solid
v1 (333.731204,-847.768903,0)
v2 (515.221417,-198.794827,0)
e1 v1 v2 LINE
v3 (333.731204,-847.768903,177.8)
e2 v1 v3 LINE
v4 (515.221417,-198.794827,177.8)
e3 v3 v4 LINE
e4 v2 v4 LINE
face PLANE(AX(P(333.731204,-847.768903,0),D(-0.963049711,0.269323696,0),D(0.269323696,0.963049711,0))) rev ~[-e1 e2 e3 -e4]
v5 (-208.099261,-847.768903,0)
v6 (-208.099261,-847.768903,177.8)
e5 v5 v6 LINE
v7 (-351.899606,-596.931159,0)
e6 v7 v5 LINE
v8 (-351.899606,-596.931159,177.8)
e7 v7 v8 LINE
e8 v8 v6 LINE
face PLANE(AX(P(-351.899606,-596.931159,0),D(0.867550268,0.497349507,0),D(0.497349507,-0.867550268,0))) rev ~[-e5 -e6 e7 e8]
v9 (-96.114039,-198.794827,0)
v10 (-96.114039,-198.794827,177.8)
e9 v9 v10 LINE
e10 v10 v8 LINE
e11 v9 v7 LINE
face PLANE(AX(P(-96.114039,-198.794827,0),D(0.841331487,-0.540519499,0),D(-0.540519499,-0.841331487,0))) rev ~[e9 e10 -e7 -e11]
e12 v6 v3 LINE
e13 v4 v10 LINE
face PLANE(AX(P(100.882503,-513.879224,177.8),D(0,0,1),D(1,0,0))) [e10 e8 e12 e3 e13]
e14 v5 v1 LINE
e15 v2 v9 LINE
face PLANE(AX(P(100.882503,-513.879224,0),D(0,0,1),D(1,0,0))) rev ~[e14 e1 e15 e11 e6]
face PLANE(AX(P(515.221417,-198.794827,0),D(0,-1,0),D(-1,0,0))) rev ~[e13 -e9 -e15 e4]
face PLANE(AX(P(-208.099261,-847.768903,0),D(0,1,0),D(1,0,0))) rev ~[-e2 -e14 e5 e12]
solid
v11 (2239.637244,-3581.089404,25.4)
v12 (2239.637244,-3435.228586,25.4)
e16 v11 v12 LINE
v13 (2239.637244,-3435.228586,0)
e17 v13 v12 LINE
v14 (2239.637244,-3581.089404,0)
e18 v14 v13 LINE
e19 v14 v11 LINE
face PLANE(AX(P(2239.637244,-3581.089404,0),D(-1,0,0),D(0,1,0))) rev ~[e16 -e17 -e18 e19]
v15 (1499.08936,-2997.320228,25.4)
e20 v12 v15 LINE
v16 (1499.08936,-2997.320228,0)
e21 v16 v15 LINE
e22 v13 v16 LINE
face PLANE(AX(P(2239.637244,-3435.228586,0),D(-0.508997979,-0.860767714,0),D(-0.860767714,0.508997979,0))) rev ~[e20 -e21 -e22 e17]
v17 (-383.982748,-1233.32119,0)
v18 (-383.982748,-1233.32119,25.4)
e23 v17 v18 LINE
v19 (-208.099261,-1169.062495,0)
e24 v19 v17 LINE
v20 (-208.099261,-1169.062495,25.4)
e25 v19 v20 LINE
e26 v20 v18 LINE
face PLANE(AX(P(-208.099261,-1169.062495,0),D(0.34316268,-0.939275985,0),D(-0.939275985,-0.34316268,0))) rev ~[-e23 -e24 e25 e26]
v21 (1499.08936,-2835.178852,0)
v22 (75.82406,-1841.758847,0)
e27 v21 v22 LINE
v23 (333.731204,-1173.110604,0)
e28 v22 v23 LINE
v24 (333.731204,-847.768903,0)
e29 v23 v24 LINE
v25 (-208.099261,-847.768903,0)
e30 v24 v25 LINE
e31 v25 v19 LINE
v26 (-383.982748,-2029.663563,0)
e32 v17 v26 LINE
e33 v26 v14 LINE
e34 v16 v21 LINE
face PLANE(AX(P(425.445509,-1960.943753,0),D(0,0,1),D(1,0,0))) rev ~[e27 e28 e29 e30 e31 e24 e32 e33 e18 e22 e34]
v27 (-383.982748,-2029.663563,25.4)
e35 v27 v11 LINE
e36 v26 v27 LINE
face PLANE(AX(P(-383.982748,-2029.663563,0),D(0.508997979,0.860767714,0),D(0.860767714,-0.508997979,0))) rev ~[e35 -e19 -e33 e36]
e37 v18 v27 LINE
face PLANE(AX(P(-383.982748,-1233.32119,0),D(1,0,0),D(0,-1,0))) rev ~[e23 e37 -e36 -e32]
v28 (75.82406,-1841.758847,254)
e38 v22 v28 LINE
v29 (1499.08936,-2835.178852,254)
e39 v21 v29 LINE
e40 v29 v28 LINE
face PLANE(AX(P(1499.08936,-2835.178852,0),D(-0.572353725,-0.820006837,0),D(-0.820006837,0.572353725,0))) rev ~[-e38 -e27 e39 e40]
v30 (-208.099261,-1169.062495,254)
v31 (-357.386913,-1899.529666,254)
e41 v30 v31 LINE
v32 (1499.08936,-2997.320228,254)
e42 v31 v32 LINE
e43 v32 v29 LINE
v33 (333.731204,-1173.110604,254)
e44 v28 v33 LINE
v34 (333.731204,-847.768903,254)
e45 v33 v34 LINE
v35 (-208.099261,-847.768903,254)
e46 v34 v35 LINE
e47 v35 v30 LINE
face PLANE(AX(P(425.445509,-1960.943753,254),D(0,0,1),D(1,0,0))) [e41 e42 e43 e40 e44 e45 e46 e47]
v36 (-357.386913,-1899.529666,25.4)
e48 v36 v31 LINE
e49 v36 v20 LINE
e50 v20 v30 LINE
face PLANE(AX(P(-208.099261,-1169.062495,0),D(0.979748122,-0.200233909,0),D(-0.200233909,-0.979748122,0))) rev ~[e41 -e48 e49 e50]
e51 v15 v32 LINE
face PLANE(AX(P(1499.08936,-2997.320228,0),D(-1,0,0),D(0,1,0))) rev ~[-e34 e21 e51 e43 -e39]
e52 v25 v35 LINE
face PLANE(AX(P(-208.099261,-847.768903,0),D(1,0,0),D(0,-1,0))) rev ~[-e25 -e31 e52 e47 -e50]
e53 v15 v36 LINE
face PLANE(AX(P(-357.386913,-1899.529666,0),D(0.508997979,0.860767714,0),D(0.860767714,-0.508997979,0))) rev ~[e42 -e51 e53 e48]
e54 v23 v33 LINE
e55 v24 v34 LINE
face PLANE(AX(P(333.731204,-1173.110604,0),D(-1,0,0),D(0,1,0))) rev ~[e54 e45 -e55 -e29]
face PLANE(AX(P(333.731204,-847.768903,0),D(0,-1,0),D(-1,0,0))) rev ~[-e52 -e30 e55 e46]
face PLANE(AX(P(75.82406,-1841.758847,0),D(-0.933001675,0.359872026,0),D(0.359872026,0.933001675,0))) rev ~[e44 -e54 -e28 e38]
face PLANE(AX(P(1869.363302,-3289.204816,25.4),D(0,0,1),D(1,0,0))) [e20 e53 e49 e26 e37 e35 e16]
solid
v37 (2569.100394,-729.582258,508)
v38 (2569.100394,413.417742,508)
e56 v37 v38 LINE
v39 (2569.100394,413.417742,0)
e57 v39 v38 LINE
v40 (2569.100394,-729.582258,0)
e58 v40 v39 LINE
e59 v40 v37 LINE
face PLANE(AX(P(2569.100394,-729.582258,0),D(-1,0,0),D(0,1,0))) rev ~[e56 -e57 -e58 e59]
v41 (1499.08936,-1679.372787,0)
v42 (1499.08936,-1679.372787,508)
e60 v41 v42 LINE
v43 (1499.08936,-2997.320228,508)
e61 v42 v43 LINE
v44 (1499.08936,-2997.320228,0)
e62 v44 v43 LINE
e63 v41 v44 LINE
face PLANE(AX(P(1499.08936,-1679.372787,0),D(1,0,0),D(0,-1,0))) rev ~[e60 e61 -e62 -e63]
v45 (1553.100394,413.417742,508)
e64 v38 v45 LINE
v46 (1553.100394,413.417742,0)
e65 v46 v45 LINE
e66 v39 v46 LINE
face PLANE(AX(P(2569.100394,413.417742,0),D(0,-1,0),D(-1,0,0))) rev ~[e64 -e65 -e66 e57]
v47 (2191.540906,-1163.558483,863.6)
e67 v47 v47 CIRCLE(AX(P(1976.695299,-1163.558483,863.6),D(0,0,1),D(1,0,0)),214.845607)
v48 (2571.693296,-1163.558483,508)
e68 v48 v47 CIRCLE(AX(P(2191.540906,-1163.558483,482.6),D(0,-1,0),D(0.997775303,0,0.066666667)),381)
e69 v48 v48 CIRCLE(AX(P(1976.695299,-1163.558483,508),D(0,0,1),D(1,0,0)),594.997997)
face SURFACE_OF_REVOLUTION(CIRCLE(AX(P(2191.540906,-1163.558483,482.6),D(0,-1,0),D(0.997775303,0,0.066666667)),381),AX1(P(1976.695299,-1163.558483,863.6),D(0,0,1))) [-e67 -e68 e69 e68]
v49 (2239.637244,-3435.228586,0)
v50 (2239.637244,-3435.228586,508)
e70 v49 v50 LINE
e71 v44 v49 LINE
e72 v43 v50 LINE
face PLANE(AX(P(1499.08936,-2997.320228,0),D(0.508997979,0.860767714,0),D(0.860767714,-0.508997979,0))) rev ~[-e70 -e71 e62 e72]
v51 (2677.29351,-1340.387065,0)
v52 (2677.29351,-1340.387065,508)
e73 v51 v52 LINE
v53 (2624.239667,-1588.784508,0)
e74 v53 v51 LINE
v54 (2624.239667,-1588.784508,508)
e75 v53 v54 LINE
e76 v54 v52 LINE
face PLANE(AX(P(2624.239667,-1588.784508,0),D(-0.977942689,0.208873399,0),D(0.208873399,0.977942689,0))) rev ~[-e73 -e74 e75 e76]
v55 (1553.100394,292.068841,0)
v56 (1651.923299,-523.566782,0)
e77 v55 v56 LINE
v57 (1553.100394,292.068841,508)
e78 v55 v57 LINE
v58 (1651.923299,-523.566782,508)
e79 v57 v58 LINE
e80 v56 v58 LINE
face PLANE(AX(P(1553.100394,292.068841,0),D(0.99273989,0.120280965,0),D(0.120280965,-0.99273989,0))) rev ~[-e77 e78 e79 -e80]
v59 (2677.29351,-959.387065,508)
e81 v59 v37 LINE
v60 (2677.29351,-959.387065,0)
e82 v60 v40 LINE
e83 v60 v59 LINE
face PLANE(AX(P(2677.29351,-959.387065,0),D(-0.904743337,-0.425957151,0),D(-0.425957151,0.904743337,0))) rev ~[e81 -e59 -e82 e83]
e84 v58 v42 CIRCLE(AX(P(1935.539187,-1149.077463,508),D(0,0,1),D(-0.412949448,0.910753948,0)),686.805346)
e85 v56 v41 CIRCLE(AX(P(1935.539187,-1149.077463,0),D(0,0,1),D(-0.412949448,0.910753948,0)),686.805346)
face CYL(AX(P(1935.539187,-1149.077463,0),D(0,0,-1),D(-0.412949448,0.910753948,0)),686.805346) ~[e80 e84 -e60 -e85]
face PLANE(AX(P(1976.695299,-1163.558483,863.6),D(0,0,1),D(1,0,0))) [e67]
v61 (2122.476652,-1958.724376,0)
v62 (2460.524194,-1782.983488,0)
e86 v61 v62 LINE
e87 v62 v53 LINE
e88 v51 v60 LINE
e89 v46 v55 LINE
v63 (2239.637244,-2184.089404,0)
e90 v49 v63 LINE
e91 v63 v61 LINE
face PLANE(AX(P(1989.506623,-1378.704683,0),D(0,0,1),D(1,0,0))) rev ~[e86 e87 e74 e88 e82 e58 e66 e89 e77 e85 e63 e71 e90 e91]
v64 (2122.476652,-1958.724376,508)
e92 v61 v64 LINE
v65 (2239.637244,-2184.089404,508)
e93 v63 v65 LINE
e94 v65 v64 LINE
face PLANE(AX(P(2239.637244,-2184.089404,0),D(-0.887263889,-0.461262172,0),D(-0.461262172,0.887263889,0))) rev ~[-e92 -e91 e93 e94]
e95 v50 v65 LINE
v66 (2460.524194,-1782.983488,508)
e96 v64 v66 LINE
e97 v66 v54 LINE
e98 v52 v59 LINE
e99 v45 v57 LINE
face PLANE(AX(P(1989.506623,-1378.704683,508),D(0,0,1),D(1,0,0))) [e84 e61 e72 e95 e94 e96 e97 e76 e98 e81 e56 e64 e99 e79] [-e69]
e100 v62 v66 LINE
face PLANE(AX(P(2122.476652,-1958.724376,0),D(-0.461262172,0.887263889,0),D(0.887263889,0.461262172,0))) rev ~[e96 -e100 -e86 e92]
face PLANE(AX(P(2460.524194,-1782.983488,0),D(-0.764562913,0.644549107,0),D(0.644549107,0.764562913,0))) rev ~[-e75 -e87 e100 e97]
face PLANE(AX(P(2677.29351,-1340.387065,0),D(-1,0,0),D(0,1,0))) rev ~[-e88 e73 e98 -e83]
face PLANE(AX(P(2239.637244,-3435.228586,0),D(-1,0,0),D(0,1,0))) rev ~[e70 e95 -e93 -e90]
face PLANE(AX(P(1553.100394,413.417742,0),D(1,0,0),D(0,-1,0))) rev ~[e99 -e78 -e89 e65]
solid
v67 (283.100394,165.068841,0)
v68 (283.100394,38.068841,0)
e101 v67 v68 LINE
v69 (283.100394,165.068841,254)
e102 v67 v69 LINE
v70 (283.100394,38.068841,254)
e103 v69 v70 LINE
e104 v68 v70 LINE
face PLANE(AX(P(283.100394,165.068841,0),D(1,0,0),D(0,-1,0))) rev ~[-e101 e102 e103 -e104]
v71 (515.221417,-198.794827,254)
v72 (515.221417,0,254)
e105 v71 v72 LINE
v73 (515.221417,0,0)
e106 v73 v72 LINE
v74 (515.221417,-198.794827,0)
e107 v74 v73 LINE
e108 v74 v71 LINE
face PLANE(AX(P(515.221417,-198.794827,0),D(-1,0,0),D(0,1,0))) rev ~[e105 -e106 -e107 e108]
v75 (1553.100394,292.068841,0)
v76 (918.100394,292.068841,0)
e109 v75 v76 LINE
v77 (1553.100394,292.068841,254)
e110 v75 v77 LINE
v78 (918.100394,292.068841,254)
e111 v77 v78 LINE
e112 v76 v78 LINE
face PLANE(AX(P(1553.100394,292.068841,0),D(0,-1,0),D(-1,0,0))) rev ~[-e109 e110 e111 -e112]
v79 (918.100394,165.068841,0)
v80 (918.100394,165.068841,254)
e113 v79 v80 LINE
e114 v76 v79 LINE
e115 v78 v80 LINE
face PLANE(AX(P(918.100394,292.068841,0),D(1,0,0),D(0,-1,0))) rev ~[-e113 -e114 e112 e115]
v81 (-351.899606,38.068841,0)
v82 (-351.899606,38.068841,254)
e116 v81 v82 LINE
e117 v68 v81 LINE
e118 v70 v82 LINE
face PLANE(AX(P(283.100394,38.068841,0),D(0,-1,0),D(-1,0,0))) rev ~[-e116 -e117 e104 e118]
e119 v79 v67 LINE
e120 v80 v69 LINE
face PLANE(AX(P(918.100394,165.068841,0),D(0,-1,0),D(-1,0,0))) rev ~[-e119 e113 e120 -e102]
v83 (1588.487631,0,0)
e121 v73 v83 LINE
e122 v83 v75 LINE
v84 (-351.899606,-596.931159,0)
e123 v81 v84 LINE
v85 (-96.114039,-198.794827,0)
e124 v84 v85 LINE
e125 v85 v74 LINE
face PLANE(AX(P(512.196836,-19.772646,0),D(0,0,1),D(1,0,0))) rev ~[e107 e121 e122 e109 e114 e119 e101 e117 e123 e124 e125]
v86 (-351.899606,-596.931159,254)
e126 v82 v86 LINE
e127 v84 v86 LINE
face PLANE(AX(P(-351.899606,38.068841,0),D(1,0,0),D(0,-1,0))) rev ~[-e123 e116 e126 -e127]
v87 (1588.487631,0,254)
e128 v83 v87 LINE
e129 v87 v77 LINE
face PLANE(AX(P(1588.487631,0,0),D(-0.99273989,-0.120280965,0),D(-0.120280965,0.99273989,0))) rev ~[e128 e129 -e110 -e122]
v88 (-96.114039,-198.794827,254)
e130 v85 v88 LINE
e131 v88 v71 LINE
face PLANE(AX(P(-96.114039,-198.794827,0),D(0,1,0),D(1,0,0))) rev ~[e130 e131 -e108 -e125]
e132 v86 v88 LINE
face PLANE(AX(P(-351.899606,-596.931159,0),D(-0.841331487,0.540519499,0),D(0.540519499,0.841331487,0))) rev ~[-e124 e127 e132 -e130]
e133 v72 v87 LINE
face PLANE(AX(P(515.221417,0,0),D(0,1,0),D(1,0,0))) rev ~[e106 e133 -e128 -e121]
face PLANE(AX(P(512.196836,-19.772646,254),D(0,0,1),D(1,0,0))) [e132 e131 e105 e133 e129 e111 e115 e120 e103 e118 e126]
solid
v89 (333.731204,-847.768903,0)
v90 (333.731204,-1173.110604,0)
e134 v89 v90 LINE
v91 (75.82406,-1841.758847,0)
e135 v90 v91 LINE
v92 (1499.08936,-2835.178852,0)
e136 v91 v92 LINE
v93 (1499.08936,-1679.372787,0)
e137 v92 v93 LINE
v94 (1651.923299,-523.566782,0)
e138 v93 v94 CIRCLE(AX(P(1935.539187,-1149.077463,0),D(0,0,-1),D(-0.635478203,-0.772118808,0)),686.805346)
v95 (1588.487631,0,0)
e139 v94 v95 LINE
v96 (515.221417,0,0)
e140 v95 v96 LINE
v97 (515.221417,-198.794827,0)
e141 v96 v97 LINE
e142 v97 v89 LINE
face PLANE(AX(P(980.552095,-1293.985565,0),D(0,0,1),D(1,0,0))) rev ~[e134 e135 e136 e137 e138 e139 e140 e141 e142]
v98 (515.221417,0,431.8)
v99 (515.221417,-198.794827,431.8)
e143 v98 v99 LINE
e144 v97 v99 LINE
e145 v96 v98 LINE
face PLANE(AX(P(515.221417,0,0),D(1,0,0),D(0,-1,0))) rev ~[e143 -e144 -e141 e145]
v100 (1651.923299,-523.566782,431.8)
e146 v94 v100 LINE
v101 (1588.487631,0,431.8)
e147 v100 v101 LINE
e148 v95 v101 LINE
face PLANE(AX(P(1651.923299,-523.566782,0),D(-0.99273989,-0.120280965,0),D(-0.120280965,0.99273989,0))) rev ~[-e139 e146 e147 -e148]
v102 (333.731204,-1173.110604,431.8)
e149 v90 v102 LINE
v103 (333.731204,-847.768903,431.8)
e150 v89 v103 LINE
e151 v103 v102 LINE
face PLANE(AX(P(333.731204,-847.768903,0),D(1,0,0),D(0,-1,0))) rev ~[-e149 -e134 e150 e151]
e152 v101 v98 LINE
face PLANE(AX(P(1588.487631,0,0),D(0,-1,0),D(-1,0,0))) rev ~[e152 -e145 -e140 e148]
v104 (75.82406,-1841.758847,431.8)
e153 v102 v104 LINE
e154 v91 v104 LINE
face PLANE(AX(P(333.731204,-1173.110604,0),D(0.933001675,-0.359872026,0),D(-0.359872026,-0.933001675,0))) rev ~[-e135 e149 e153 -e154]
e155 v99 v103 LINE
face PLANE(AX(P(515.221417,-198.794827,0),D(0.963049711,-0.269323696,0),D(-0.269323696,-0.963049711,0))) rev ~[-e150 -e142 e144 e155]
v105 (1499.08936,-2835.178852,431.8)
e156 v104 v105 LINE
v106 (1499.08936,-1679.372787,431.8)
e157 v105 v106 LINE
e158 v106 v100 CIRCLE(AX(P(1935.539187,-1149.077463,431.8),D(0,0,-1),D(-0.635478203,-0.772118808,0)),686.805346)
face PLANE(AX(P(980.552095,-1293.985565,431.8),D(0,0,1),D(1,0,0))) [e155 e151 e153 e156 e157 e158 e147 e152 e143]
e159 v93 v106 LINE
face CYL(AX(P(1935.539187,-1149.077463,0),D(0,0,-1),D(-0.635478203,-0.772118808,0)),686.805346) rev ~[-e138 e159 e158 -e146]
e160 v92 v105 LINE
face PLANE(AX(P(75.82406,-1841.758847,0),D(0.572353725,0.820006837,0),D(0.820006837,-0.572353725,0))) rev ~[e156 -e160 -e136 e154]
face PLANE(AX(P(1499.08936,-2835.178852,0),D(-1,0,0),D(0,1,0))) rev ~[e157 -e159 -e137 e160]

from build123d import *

# Parameters (mm, degrees)
F1_DEPTH = 25.4
F2_DEPTH = 254
F3_DEPTH = 177.8
F4_DEPTH = 431.8
F0_R     = 594.9979970548
F5_DEPTH = 508
F6_DEPTH = 863.6


# Not quite as in the source:
# - a fillet or chamfer that OpenCascade refuses, or shapes differently, is made with other operations: its cross-section is extruded or revolved along the edge and cut away or added


with BuildPart() as f1:
    # F0 (on Top) → F1 (new body)
    with BuildSketch(Plane.XY):
        Polygon((2239.6372437481, -3435.2285861969), (1499.0893602371, -2997.3202280322), (1499.0893602371, -3143.1810455656), (2239.6372437481, -3581.0894037303), align=None)
        Polygon((-357.3869134164, -1899.5296663834), (-208.0992609262, -1169.0624952316), (-383.9827477932, -1233.3211898804), (-383.9827477932, -2029.6635627747), align=None)
        Polygon((1499.0893602371, -2997.3202280322), (-357.3869134164, -1899.5296663834), (-383.9827477932, -2029.6635627747), (1499.0893602371, -3143.1810455656), align=None)
    extrude(amount=F1_DEPTH)

    # F0 (on Top) → F2 (join)
    with BuildSketch(Plane.XY):
        Polygon((333.7312042713, -847.7689027786), (-208.0992609262, -847.7689027786), (-208.0992609262, -1169.0624952316), (-357.3869134164, -1899.5296663834), (1499.0893602371, -2997.3202280322), (1499.0893602371, -2835.1788520813), (75.824059546, -1841.7588472366), (333.7312042713, -1173.1106042862), align=None)
    extrude(amount=F2_DEPTH)


with BuildPart() as f2:
    # F0 (on Top) → F2, piece 2 (new body)
    with BuildSketch(Plane.XY):
        Polygon((283.1003940614, 38.0688405037), (-351.8996059386, 38.0688405037), (-351.8996059386, -596.9311594963), (-96.1140394211, -198.7948268652), (515.2214169502, -198.7948268652), (515.2214169502, 0), (1588.4876312045, 0), (1553.1003940614, 292.0688405037), (918.1003940614, 292.0688405037), (918.1003940614, 165.0688405037), (283.1003940614, 165.0688405037), align=None)
    extrude(amount=F2_DEPTH)


with BuildPart() as f3:
    # F0 (on Top) → F3 (new body)
    with BuildSketch(Plane.XY):
        Polygon((-96.1140394211, -198.7948268652), (-351.8996059386, -596.9311594963), (-208.0992609262, -847.7689027786), (333.7312042713, -847.7689027786), (515.2214169502, -198.7948268652), align=None)
    extrude(amount=F3_DEPTH)


with BuildPart() as f4:
    # F0 (on Top) → F4 (new body)
    with BuildSketch(Plane.XY):
        with BuildLine():
            Line((515.2214169502, -198.7948268652), (333.7312042713, -847.7689027786))
            Line((333.7312042713, -847.7689027786), (333.7312042713, -1173.1106042862))
            Line((333.7312042713, -1173.1106042862), (75.824059546, -1841.7588472366))
            Line((75.824059546, -1841.7588472366), (1499.0893602371, -2835.1788520813))
            Line((1499.0893602371, -2835.1788520813), (1499.0893602371, -1679.3727874756))
            ThreePointArc((1499.0893602371, -1679.3727874756), (1254.6606819019, -1059.0438901467), (1651.9232988358, -523.5667824745))
            Line((1651.9232988358, -523.5667824745), (1588.4876312045, 0))
            Line((1588.4876312045, 0), (515.2214169502, 0))
            Line((515.2214169502, 0), (515.2214169502, -198.7948268652))
        make_face()
    extrude(amount=F4_DEPTH)


with BuildPart() as f5:
    # F0 (on Top) → F5 (new body)
    with BuildSketch(Plane.XY):
        with BuildLine():
            Line((1553.1003940614, 413.4177421996), (1553.1003940614, 292.0688405037))
            Line((1553.1003940614, 292.0688405037), (1588.4876312045, 0))
            Line((1588.4876312045, 0), (1651.9232988358, -523.5667824745))
            ThreePointArc((1651.9232988358, -523.5667824745), (1254.6606819019, -1059.0438901467), (1499.0893602371, -1679.3727874756))
            Line((1499.0893602371, -1679.3727874756), (1499.0893602371, -2835.1788520813))
            Line((1499.0893602371, -2835.1788520813), (1499.0893602371, -2997.3202280322))
            Line((1499.0893602371, -2997.3202280322), (2239.6372437481, -3435.2285861969))
            Line((2239.6372437481, -3435.2285861969), (2239.6372437481, -2184.0894037303))
            Line((2239.6372437481, -2184.0894037303), (2122.4766519932, -1958.7243759651))
            Line((2122.4766519932, -1958.7243759651), (2460.5241936411, -1782.9834883327))
            Line((2460.5241936411, -1782.9834883327), (2624.2396669257, -1588.7845083992))
            Line((2624.2396669257, -1588.7845083992), (2677.2935103517, -1340.3870653815))
            Line((2677.2935103517, -1340.3870653815), (2677.2935103517, -959.3870653815))
            Line((2677.2935103517, -959.3870653815), (2569.1003940614, -729.5822578004))
            Line((2569.1003940614, -729.5822578004), (2569.1003940614, 413.4177421996))
            Line((2569.1003940614, 413.4177421996), (1553.1003940614, 413.4177421996))
        make_face()
        with Locations((1976.6952991486, -1163.5584831238)):
            Circle(F0_R, mode=Mode.SUBTRACT)
    extrude(amount=F5_DEPTH)

    # F0 (on Top) → F6 (join)
    with BuildSketch(Plane.XY):
        with Locations((1976.6952991486, -1163.5584831238)):
            Circle(F0_R)
    extrude(amount=F6_DEPTH)

    # F7: fillet of radius 381 on 1 edges, made by hand

    # F7_s1 → F7_t2 (revolve, cut)
    with BuildSketch(Plane.XZ.offset(1163.5584831238)):
        with BuildLine():
            ThreePointArc((2571.6932962034, 508), (2451.8134551625, 760.8430592126), (2191.5409057072, 863.6))
            Line((2191.5409057072, 863.6), (2571.6932962034, 863.6))
            Line((2571.6932962034, 863.6), (2571.6932962034, 508))
        make_face()
    revolve(axis=Axis((1976.6952991486, -1163.5584831238, 863.6), (0, 0, 1)), mode=Mode.SUBTRACT)


solid = Compound([f1.part, f2.part, f3.part, f4.part, f5.part])
